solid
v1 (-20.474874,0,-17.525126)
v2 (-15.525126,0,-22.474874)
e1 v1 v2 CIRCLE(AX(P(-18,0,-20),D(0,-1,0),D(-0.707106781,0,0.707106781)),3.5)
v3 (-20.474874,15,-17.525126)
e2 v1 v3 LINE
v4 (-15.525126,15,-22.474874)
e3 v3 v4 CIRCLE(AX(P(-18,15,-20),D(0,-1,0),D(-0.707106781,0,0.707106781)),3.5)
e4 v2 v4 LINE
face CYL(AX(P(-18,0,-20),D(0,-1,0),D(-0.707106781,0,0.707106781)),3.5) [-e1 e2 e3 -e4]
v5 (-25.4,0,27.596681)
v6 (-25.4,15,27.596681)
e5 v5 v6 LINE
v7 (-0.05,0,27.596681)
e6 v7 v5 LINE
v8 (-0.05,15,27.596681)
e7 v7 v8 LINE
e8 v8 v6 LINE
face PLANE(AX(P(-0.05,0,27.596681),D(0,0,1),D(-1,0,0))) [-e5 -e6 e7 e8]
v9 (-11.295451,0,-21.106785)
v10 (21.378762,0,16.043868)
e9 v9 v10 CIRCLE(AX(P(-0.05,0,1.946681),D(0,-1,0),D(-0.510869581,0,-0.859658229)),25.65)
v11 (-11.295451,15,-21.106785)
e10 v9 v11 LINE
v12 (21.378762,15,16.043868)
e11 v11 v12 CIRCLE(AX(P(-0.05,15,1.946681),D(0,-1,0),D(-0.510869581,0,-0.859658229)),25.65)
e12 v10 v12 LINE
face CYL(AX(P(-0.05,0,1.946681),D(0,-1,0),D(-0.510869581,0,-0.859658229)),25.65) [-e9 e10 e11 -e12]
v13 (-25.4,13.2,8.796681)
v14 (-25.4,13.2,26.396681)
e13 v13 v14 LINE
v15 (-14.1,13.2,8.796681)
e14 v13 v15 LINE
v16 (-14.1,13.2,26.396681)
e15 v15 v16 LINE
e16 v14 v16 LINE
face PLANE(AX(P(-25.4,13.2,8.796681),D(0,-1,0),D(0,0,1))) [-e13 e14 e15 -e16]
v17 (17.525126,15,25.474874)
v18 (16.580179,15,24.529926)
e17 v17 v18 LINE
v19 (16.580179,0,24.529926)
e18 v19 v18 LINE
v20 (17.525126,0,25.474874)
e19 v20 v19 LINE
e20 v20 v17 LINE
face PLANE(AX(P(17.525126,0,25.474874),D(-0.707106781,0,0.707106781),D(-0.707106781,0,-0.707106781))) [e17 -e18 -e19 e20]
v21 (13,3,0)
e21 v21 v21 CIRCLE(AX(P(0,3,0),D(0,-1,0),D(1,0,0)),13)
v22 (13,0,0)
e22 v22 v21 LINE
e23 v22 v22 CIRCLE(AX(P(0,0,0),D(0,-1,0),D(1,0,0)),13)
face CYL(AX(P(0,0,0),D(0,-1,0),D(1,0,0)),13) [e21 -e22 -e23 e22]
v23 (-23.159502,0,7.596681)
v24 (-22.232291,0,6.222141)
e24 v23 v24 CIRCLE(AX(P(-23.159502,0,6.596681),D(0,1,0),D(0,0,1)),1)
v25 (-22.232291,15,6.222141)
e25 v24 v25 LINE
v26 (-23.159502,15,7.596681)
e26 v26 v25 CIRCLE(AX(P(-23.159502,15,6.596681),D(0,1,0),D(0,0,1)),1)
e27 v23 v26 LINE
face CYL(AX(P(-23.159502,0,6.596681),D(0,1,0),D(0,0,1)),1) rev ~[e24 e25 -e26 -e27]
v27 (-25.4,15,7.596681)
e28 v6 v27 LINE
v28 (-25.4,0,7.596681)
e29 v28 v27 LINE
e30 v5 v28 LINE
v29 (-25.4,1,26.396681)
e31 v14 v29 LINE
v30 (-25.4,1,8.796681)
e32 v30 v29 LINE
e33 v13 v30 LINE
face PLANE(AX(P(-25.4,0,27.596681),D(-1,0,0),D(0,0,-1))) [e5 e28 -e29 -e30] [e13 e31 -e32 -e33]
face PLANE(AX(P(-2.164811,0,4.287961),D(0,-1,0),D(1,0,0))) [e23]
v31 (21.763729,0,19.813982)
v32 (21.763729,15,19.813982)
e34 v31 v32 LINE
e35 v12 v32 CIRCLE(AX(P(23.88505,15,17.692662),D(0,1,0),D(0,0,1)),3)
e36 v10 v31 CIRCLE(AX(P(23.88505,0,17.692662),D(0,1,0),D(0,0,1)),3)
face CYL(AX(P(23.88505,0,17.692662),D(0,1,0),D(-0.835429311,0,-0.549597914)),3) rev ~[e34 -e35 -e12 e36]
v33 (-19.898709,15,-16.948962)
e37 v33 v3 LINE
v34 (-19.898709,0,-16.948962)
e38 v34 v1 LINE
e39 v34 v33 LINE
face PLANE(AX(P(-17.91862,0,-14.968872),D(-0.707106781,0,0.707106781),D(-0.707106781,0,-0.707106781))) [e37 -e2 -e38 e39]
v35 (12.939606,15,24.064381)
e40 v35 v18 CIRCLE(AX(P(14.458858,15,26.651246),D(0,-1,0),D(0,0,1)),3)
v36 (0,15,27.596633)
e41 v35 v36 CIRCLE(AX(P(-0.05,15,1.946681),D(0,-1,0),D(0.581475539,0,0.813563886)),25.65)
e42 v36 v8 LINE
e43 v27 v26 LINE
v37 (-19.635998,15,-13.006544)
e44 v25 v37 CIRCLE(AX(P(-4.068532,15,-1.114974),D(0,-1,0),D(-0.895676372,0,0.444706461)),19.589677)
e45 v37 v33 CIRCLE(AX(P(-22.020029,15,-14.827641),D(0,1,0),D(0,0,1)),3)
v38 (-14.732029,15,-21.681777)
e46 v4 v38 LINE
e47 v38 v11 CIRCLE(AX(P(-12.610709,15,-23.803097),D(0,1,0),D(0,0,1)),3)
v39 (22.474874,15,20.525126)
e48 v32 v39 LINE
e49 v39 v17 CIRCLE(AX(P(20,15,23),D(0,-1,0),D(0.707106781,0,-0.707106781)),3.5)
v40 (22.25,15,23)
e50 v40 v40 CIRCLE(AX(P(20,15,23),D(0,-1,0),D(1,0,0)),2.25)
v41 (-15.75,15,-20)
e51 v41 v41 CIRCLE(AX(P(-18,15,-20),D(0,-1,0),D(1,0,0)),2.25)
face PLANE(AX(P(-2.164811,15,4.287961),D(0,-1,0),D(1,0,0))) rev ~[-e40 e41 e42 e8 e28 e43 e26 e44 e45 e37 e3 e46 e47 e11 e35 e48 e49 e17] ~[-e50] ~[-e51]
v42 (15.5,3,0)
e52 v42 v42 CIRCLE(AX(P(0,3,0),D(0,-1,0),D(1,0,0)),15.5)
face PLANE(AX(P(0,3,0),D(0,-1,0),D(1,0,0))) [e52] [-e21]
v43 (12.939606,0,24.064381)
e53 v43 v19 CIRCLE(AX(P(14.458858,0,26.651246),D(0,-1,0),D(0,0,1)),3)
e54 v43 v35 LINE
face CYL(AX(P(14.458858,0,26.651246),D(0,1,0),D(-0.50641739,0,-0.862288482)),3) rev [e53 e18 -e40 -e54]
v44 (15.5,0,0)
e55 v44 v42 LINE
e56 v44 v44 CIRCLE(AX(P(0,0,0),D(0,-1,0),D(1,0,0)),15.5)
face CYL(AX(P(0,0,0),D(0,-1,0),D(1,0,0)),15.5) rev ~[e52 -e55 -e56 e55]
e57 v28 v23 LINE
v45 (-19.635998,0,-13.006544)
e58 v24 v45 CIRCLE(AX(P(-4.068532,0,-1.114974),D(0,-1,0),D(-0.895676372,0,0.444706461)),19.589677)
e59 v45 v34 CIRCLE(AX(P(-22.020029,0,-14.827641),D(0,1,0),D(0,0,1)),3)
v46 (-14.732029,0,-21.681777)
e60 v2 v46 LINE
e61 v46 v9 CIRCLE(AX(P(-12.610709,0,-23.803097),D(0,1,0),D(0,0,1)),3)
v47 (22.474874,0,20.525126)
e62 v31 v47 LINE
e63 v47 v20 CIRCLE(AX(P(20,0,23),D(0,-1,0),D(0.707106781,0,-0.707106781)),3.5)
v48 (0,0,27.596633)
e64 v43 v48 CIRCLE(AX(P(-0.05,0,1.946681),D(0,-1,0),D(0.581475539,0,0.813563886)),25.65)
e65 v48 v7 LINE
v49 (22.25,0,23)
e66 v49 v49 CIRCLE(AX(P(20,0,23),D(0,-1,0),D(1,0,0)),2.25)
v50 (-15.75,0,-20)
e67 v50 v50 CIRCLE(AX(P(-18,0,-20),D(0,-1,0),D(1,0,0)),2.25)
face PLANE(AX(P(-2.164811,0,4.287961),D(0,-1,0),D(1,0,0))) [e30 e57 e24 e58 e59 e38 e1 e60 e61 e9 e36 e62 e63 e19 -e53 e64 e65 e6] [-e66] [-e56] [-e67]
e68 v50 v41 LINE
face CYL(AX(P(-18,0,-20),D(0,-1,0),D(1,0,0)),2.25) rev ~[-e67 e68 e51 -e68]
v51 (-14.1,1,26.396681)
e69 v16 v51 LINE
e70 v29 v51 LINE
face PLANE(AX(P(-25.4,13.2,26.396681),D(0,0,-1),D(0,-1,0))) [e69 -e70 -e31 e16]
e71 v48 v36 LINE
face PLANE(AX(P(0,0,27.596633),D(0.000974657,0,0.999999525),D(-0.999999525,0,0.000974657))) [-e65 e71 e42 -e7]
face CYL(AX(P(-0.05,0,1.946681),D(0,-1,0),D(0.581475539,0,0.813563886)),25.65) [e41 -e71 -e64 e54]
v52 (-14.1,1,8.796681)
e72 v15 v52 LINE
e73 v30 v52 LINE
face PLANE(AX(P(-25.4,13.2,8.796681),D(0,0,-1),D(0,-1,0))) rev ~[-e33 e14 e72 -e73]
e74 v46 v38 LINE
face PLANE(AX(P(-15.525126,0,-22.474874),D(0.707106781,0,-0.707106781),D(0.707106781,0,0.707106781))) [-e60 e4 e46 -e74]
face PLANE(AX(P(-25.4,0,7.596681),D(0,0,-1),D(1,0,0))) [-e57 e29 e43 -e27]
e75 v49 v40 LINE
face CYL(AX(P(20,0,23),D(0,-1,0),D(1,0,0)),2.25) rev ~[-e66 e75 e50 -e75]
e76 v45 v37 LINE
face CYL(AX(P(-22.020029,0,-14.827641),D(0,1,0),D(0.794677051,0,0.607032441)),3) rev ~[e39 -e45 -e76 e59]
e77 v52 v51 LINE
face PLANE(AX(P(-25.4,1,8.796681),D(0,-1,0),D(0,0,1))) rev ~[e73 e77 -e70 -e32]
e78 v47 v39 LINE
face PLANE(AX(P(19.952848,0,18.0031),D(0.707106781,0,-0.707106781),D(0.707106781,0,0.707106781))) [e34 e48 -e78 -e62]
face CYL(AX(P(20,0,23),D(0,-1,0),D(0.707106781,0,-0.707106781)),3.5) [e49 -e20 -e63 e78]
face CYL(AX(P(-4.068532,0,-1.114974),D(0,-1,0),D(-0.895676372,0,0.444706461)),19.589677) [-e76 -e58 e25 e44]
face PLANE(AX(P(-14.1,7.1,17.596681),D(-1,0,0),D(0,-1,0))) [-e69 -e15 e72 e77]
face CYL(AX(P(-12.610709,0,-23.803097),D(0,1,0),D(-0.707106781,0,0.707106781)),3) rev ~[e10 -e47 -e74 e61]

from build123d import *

# Parameters (mm, degrees)
F0_R     = 2.25
F0_R_2   = 15.5
F0_R_3   = 13
F1_DEPTH = 15
F2_DEPTH = 3
F3_W     = 12.2
F3_H     = 17.6
F4_DEPTH = 11.3
F5_R     = 1
F6_R     = 3


# Not quite as in the source:
# - ends of sketch curves that miss each other by under 0.0002 mm in the source are joined


with BuildPart() as f1:
    # F0 (on Front) → F1 (new body)
    with BuildSketch(Plane.XZ):
        with BuildLine():
            Line((-0.05, 27.5966813602), (-25.4, 27.5966813602))
            Line((-25.4, 27.5966813602), (-25.4, 7.5966813602))
            Line((-25.4, 7.5966813602), (-21.614542231, 7.5966813602))
            ThreePointArc((-21.614542231, 7.5966813602), (-23.4006244197, -4.2813010605), (-17.918619958, -14.9688724896))
            Line((-17.918619958, -14.9688724896), (-20.4748737342, -17.5251262658))
            ThreePointArc((-20.4748737342, -17.5251262658), (-20.4748737342, -22.4748737342), (-15.5251262658, -22.4748737342))
            Line((-15.5251262658, -22.4748737342), (-13.153804753, -20.1035522213))
            ThreePointArc((-13.153804753, -20.1035522213), (19.3130689129, -14.8757459996), (19.9528476572, 18.0031001889))
            Line((19.9528476572, 18.0031001889), (22.4748737342, 20.5251262658))
            ThreePointArc((22.4748737342, 20.5251262658), (22.4748737342, 25.4748737342), (17.5251262658, 25.4748737342))
            Line((17.5251262658, 25.4748737342), (14.8648475796, 22.8145950479))
            ThreePointArc((14.8648475796, 22.8145950479), (7.8051661925, 26.3642746914), (-9.5e-08, 27.5966326274))
            Line((-9.5e-08, 27.5966326274), (-0.05, 27.5966813602))
        make_face()
        with Locations((-18, -20)):
            Circle(F0_R, mode=Mode.SUBTRACT)
        Circle(F0_R_2, mode=Mode.SUBTRACT)
        with Locations((20, 23)):
            Circle(F0_R, mode=Mode.SUBTRACT)
        Circle(F0_R_2)
        Circle(F0_R_3, mode=Mode.SUBTRACT)
        Circle(F0_R_3)
    extrude(amount=-F1_DEPTH)

    # F0 (on Front) → F2 (cut)
    with BuildSketch(Plane.XZ):
        Circle(F0_R_2)
        Circle(F0_R_3, mode=Mode.SUBTRACT)
    extrude(amount=-F2_DEPTH, mode=Mode.SUBTRACT)

    # F3 (on face) → F4 (cut)
    with BuildSketch(Plane(origin=(-25.4, 0, 0), x_dir=(0, -1, 0), z_dir=(-1, 0, 0))):
        with Locations((-7.1, 17.5966813602)):
            Rectangle(F3_W, F3_H)
    extrude(amount=-F4_DEPTH, mode=Mode.SUBTRACT)

    # F5
    f5_edges = [f1.edges().sort_by_distance(p)[0] for p in [
        (-21.614542, 7.5, 7.596681),
    ]]
    fillet(f5_edges, radius=F5_R)

    # F6
    f6_edges = [f1.edges().sort_by_distance(p)[0] for p in [
        (-17.91862, 7.5, -14.968872),
        (-13.153805, 7.5, -20.103552),
        (19.952848, 7.5, 18.0031),
        (14.864848, 7.5, 22.814595),
    ]]
    fillet(f6_edges, radius=F6_R)


solid = f1.part
